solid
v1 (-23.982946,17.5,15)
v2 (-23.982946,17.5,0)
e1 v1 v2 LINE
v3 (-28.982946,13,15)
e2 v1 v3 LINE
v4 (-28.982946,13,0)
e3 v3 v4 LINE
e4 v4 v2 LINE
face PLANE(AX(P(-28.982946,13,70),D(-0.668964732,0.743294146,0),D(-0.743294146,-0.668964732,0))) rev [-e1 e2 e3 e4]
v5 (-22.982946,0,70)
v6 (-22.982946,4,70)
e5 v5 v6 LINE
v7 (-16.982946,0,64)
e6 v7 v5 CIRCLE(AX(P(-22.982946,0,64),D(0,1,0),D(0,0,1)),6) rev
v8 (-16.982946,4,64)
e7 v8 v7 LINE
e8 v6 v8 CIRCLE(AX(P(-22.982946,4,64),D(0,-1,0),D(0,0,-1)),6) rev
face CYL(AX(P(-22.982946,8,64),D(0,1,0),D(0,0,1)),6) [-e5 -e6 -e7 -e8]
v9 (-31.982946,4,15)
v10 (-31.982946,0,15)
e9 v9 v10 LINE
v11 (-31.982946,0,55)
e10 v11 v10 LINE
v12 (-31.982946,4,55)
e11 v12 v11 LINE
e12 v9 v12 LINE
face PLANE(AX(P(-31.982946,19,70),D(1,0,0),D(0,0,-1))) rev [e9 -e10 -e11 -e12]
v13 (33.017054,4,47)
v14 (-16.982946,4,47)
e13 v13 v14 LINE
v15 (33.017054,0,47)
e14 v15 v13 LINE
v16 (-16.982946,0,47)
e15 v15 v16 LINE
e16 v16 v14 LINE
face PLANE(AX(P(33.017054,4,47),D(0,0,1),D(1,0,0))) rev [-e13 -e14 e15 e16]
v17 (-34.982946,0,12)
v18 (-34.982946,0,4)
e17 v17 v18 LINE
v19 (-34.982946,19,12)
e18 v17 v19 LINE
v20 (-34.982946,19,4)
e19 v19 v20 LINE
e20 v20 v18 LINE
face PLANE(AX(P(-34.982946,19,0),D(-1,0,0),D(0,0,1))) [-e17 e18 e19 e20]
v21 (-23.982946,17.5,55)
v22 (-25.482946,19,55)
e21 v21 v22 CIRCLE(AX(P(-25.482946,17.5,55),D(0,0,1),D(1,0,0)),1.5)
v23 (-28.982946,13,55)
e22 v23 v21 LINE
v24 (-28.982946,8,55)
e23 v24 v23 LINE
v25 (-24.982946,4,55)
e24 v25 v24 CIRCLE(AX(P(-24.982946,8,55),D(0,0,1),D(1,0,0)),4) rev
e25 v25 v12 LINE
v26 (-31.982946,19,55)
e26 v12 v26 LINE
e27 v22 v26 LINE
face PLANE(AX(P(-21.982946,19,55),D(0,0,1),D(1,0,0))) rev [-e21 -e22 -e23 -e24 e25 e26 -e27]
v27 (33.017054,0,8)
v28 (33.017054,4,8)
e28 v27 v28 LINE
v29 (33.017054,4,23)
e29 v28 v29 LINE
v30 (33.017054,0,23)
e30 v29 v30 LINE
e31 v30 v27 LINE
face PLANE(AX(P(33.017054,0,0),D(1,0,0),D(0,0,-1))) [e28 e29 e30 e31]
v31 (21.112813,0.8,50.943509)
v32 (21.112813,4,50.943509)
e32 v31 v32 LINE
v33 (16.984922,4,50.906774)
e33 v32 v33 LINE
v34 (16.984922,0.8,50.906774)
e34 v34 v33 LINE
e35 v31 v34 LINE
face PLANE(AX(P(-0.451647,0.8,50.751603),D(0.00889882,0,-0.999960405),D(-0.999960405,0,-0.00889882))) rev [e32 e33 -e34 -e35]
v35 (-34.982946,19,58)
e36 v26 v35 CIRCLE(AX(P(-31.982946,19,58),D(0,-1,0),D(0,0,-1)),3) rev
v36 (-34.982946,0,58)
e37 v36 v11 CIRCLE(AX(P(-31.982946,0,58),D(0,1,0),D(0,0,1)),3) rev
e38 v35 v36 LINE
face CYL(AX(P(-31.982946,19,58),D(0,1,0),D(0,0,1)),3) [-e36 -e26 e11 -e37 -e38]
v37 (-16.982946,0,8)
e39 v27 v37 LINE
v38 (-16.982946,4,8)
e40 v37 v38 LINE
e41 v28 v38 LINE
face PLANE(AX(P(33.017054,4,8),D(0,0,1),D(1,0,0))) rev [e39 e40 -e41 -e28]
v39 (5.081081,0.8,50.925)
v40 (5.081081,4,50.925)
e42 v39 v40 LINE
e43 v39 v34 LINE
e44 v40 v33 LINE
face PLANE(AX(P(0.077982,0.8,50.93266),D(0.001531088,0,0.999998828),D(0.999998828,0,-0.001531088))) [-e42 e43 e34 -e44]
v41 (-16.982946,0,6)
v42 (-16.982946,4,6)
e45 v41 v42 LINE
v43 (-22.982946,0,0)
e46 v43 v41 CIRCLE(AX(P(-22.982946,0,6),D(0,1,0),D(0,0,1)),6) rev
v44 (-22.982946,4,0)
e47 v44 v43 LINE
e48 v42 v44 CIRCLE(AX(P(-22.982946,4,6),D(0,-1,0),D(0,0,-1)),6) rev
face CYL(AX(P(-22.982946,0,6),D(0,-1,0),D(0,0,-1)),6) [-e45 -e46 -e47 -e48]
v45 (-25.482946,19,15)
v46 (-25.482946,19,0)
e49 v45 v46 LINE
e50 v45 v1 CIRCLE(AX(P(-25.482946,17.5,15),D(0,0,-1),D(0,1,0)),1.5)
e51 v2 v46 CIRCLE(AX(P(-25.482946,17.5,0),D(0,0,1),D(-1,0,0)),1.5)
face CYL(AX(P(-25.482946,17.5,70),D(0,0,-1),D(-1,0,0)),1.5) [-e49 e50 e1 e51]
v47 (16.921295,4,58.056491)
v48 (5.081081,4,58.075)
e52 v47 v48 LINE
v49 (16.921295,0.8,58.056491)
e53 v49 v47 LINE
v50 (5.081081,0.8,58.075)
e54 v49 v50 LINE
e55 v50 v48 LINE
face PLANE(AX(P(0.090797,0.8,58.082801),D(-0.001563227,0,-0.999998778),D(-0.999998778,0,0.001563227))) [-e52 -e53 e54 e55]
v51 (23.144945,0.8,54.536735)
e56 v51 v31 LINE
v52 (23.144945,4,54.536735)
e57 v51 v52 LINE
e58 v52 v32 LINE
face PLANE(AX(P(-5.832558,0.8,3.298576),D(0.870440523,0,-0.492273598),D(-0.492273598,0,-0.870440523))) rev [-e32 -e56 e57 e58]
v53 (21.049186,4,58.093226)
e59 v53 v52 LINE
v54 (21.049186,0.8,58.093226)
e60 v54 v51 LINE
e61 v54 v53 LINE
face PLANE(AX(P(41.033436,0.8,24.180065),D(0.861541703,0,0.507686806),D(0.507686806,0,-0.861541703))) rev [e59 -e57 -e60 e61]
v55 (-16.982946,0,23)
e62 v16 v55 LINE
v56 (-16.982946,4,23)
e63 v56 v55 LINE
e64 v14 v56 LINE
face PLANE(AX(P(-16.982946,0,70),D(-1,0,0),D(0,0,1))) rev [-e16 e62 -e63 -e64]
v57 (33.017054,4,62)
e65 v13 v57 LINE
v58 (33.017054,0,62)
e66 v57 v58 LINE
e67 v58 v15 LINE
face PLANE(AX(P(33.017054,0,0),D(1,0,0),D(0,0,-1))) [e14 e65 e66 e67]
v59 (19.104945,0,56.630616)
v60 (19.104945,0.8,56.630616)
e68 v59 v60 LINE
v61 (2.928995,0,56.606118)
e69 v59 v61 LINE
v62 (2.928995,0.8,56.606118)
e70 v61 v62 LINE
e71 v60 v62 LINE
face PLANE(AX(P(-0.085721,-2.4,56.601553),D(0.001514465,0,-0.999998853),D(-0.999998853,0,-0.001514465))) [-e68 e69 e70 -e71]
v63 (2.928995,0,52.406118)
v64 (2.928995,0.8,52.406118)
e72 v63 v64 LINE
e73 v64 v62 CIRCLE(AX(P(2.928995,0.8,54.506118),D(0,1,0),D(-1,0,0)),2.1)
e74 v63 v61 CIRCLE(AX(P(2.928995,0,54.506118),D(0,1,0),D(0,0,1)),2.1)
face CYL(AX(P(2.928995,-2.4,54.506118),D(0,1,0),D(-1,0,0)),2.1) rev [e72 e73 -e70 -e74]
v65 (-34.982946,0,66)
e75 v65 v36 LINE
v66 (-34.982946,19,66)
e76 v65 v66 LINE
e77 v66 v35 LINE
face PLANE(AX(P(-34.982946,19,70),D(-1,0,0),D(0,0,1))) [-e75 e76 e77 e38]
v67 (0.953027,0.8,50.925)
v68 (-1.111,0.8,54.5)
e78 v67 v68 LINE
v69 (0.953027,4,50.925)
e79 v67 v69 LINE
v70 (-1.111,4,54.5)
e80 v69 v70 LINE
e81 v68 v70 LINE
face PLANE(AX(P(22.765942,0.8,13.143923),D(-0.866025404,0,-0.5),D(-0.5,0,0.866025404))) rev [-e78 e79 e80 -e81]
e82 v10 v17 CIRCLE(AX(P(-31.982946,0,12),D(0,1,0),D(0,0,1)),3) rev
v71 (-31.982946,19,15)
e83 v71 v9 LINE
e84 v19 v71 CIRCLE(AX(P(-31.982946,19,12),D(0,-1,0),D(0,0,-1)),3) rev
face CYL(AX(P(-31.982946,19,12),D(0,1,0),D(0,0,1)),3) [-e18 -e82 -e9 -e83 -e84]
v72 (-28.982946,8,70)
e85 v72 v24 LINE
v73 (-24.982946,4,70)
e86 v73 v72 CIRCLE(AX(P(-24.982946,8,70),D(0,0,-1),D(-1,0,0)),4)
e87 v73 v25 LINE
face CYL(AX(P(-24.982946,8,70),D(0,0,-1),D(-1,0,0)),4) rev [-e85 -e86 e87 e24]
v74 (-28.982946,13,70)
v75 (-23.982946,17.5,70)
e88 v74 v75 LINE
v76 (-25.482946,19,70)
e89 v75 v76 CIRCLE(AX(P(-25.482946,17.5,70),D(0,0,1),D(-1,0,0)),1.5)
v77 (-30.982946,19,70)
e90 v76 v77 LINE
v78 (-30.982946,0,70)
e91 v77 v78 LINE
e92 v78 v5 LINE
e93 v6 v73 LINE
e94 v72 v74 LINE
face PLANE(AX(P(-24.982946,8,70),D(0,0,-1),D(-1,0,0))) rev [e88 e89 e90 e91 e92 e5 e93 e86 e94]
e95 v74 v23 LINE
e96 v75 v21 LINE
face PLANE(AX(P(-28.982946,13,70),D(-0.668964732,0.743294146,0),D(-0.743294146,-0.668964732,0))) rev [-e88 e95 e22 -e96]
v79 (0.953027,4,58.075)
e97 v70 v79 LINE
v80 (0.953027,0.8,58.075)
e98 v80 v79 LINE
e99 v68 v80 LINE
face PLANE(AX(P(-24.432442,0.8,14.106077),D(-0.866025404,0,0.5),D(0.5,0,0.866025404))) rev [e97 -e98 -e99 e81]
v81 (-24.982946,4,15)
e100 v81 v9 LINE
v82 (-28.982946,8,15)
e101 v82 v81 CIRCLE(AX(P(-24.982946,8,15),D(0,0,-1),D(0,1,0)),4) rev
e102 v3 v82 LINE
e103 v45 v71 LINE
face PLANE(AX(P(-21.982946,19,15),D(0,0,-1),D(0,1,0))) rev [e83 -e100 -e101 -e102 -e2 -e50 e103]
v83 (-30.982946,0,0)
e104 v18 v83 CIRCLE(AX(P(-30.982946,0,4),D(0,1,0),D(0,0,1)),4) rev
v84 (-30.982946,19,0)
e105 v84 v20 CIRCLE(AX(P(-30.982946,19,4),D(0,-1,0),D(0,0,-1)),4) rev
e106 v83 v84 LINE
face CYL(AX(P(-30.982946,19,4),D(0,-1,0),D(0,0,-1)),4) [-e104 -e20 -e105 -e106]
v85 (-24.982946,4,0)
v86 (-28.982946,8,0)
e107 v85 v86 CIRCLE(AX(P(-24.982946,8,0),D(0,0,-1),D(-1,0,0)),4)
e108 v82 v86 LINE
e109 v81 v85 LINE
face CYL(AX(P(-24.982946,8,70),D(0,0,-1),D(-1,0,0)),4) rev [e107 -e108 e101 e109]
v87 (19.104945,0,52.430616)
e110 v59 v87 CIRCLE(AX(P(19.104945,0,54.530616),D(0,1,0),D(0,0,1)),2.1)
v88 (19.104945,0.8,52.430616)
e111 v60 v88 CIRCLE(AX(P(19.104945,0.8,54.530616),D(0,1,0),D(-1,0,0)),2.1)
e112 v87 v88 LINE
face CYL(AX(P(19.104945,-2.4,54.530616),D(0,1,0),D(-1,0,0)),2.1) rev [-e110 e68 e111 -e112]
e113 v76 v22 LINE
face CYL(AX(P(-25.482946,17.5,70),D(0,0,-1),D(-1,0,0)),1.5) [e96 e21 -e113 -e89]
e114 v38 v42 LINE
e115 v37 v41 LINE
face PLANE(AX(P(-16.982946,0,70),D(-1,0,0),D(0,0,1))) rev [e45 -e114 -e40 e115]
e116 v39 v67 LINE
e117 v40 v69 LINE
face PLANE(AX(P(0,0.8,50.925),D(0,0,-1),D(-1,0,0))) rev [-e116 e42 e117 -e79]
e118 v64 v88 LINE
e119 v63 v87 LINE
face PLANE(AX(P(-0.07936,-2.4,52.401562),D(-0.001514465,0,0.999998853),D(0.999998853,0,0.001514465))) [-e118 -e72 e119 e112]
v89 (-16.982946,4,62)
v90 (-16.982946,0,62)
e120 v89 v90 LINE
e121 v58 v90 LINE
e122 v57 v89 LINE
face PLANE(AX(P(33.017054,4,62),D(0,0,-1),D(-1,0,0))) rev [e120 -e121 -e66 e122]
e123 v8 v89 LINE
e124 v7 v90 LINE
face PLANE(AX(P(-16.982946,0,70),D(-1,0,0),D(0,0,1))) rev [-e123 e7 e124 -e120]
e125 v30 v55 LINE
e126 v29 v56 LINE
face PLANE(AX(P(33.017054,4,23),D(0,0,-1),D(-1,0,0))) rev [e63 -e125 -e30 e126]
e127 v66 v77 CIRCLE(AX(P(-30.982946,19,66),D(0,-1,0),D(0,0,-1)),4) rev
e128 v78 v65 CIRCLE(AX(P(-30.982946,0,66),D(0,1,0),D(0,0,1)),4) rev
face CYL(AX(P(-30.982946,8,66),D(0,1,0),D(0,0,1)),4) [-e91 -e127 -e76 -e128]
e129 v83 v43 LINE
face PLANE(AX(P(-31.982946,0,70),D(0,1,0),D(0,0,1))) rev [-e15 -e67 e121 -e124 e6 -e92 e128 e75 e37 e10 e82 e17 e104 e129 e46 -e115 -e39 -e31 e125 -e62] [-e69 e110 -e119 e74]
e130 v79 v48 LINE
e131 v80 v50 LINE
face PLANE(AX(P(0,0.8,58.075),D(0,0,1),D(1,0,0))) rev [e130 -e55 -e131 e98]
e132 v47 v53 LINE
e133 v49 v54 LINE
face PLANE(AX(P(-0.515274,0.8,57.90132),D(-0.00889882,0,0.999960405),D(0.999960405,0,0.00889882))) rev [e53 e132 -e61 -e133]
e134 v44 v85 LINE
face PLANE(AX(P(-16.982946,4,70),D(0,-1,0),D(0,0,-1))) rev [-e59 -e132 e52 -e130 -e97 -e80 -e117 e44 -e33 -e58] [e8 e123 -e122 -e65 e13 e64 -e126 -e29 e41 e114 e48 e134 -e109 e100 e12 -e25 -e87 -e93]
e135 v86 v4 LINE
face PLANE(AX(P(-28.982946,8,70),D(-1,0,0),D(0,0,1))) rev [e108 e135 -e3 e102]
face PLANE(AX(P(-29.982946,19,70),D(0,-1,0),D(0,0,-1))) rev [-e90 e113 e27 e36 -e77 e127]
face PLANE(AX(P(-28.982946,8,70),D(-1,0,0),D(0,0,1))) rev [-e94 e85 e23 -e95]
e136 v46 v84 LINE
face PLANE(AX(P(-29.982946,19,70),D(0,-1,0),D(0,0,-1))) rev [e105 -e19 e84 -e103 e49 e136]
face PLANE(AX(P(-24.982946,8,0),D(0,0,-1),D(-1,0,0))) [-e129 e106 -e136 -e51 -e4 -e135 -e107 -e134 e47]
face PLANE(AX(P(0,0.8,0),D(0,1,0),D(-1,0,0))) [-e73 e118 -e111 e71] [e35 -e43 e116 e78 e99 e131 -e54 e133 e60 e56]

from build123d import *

# Parameters (mm, degrees)
BOSS_EXTRU_1_DEPTH      = 70
ESQUISSE5_W             = 40
ESQUISSE5_H             = 15
ENL_V_MAT_EXTRU_2_DEPTH = 10
ESQUISSE7_W             = 15
ESQUISSE7_H             = 4
BOSS_EXTRU_4_DEPTH      = 50
ENL_V_MAT_EXTRU_6_DEPTH = 3.2
ENL_V_MAT_EXTRU_7_DEPTH = 3.2
CONG_1_R                = 6
ESQUISSE19_W            = 3
ESQUISSE19_H            = 15
BOSS_EXTRU_6_DEPTH      = 19
CONG_3_R                = 4
CONG_5_R                = 3


with BuildPart() as part:
    # Esquisse1 → Boss.-Extru.1 (new body)
    with BuildSketch(Plane.XY):
        with BuildLine():
            Line((-31.982945736, 17), (-31.982945736, 0))
            Line((-31.982945736, 0), (-16.982945736, 0))
            Line((-16.982945736, 0), (-16.982945736, 4))
            Line((-16.982945736, 4), (-24.982945736, 4))
            ThreePointArc((-24.982945736, 4), (-27.811372861, 5.171572875), (-28.982945736, 8))
            Line((-28.982945736, 8), (-28.982945736, 13))
            Line((-28.982945736, 13), (-23.982945736, 17.5))
            ThreePointArc((-23.982945736, 17.5), (-24.422285565, 18.560660172), (-25.482945736, 19))
            Line((-25.482945736, 19), (-28.982945736, 19))
            Line((-28.982945736, 19), (-29.982945736, 19))
            Line((-29.982945736, 19), (-31.982945736, 19))
            Line((-31.982945736, 19), (-31.982945736, 18))
            Line((-31.982945736, 18), (-31.982945736, 17))
        make_face()
    extrude(amount=BOSS_EXTRU_1_DEPTH)

    # Esquisse5 → Enlèv. mat.-Extru.2 (cut)
    with BuildSketch(Plane.ZY.offset(31.982945736)):
        with Locations((35, 11.5)):
            Rectangle(ESQUISSE5_W, ESQUISSE5_H)
    extrude(amount=-ENL_V_MAT_EXTRU_2_DEPTH, mode=Mode.SUBTRACT)

    # Esquisse7 → Boss.-Extru.4 (add)
    with BuildSketch(Plane(origin=(-16.982945736, 0, 0), x_dir=(0, 0, -1), z_dir=(1, 0, 0))):
        with Locations((-15.5, 2)):
            Rectangle(ESQUISSE7_W, ESQUISSE7_H)
        with Locations((-54.5, 2)):
            Rectangle(ESQUISSE7_W, ESQUISSE7_H)
    extrude(amount=BOSS_EXTRU_4_DEPTH)

    # Esquisse17 → Enlèv. mat.-Extru.6 (cut)
    with BuildSketch(Plane(origin=(0, 4, 0), x_dir=(1, 0, 0), z_dir=(0, 1, 0))):
        Polygon((5.081081476, -50.925), (0.953027051, -50.925), (-1.111000161, -54.5), (0.953027051, -58.075), (5.081081476, -58.075), (7.145108688, -54.5), align=None)
        Polygon((16.921295497, -58.056491041), (5.081081476, -58.075), (7.145108688, -54.5), (5.081081476, -50.925), (16.984922057, -50.906774147), (14.88916329, -54.463265188), align=None)
        Polygon((16.921295497, -58.056491041), (21.04918647, -58.093225853), (23.144945237, -54.536734812), (21.11281303, -50.943508959), (16.984922057, -50.906774147), (14.88916329, -54.463265188), align=None)
    extrude(amount=-ENL_V_MAT_EXTRU_6_DEPTH, mode=Mode.SUBTRACT)

    # Esquisse18 → Enlèv. mat.-Extru.7 (cut)
    with BuildSketch(Plane(origin=(0, 0.8, 0), x_dir=(1, 0, 0), z_dir=(0, 1, 0))):
        with BuildLine():
            Line((19.104945237, -52.430616368), (2.928995206, -52.406118437))
            ThreePointArc((2.928995206, -52.406118437), (0.828995206, -54.506118437), (2.928995206, -56.606118437))
            Line((2.928995206, -56.606118437), (19.104945237, -56.630616368))
            ThreePointArc((19.104945237, -56.630616368), (21.204945237, -54.530616368), (19.104945237, -52.430616368))
        make_face()
    extrude(amount=-ENL_V_MAT_EXTRU_7_DEPTH, mode=Mode.SUBTRACT)

    # Congé1
    cong_1_edges = [part.edges().sort_by_distance(p)[0] for p in [
        (-16.982945736, 2, 0),
        (-16.982945736, 2, 70),
    ]]
    fillet(cong_1_edges, radius=CONG_1_R)

    # Esquisse19 → Boss.-Extru.6 (add)
    with BuildSketch(Plane.XZ):
        with Locations((-33.482945736, 62.5)):
            Rectangle(ESQUISSE19_W, ESQUISSE19_H)
        with Locations((-33.482945736, 7.5)):
            Rectangle(ESQUISSE19_W, ESQUISSE19_H)
    extrude(amount=-BOSS_EXTRU_6_DEPTH)

    # Congé3
    cong_3_edges = [part.edges().sort_by_distance(p)[0] for p in [
        (-34.982945736, 9.5, 70),
        (-34.982945736, 9.5, 0),
    ]]
    fillet(cong_3_edges, radius=CONG_3_R)

    # Congé5
    cong_5_edges = [part.edges().sort_by_distance(p)[0] for p in [
        (-34.982945736, 9.5, 55),
        (-34.982945736, 9.5, 15),
    ]]
    fillet(cong_5_edges, radius=CONG_5_R - 0.0001)  # a hair under: the kernel refuses the full size


solid = part.part
